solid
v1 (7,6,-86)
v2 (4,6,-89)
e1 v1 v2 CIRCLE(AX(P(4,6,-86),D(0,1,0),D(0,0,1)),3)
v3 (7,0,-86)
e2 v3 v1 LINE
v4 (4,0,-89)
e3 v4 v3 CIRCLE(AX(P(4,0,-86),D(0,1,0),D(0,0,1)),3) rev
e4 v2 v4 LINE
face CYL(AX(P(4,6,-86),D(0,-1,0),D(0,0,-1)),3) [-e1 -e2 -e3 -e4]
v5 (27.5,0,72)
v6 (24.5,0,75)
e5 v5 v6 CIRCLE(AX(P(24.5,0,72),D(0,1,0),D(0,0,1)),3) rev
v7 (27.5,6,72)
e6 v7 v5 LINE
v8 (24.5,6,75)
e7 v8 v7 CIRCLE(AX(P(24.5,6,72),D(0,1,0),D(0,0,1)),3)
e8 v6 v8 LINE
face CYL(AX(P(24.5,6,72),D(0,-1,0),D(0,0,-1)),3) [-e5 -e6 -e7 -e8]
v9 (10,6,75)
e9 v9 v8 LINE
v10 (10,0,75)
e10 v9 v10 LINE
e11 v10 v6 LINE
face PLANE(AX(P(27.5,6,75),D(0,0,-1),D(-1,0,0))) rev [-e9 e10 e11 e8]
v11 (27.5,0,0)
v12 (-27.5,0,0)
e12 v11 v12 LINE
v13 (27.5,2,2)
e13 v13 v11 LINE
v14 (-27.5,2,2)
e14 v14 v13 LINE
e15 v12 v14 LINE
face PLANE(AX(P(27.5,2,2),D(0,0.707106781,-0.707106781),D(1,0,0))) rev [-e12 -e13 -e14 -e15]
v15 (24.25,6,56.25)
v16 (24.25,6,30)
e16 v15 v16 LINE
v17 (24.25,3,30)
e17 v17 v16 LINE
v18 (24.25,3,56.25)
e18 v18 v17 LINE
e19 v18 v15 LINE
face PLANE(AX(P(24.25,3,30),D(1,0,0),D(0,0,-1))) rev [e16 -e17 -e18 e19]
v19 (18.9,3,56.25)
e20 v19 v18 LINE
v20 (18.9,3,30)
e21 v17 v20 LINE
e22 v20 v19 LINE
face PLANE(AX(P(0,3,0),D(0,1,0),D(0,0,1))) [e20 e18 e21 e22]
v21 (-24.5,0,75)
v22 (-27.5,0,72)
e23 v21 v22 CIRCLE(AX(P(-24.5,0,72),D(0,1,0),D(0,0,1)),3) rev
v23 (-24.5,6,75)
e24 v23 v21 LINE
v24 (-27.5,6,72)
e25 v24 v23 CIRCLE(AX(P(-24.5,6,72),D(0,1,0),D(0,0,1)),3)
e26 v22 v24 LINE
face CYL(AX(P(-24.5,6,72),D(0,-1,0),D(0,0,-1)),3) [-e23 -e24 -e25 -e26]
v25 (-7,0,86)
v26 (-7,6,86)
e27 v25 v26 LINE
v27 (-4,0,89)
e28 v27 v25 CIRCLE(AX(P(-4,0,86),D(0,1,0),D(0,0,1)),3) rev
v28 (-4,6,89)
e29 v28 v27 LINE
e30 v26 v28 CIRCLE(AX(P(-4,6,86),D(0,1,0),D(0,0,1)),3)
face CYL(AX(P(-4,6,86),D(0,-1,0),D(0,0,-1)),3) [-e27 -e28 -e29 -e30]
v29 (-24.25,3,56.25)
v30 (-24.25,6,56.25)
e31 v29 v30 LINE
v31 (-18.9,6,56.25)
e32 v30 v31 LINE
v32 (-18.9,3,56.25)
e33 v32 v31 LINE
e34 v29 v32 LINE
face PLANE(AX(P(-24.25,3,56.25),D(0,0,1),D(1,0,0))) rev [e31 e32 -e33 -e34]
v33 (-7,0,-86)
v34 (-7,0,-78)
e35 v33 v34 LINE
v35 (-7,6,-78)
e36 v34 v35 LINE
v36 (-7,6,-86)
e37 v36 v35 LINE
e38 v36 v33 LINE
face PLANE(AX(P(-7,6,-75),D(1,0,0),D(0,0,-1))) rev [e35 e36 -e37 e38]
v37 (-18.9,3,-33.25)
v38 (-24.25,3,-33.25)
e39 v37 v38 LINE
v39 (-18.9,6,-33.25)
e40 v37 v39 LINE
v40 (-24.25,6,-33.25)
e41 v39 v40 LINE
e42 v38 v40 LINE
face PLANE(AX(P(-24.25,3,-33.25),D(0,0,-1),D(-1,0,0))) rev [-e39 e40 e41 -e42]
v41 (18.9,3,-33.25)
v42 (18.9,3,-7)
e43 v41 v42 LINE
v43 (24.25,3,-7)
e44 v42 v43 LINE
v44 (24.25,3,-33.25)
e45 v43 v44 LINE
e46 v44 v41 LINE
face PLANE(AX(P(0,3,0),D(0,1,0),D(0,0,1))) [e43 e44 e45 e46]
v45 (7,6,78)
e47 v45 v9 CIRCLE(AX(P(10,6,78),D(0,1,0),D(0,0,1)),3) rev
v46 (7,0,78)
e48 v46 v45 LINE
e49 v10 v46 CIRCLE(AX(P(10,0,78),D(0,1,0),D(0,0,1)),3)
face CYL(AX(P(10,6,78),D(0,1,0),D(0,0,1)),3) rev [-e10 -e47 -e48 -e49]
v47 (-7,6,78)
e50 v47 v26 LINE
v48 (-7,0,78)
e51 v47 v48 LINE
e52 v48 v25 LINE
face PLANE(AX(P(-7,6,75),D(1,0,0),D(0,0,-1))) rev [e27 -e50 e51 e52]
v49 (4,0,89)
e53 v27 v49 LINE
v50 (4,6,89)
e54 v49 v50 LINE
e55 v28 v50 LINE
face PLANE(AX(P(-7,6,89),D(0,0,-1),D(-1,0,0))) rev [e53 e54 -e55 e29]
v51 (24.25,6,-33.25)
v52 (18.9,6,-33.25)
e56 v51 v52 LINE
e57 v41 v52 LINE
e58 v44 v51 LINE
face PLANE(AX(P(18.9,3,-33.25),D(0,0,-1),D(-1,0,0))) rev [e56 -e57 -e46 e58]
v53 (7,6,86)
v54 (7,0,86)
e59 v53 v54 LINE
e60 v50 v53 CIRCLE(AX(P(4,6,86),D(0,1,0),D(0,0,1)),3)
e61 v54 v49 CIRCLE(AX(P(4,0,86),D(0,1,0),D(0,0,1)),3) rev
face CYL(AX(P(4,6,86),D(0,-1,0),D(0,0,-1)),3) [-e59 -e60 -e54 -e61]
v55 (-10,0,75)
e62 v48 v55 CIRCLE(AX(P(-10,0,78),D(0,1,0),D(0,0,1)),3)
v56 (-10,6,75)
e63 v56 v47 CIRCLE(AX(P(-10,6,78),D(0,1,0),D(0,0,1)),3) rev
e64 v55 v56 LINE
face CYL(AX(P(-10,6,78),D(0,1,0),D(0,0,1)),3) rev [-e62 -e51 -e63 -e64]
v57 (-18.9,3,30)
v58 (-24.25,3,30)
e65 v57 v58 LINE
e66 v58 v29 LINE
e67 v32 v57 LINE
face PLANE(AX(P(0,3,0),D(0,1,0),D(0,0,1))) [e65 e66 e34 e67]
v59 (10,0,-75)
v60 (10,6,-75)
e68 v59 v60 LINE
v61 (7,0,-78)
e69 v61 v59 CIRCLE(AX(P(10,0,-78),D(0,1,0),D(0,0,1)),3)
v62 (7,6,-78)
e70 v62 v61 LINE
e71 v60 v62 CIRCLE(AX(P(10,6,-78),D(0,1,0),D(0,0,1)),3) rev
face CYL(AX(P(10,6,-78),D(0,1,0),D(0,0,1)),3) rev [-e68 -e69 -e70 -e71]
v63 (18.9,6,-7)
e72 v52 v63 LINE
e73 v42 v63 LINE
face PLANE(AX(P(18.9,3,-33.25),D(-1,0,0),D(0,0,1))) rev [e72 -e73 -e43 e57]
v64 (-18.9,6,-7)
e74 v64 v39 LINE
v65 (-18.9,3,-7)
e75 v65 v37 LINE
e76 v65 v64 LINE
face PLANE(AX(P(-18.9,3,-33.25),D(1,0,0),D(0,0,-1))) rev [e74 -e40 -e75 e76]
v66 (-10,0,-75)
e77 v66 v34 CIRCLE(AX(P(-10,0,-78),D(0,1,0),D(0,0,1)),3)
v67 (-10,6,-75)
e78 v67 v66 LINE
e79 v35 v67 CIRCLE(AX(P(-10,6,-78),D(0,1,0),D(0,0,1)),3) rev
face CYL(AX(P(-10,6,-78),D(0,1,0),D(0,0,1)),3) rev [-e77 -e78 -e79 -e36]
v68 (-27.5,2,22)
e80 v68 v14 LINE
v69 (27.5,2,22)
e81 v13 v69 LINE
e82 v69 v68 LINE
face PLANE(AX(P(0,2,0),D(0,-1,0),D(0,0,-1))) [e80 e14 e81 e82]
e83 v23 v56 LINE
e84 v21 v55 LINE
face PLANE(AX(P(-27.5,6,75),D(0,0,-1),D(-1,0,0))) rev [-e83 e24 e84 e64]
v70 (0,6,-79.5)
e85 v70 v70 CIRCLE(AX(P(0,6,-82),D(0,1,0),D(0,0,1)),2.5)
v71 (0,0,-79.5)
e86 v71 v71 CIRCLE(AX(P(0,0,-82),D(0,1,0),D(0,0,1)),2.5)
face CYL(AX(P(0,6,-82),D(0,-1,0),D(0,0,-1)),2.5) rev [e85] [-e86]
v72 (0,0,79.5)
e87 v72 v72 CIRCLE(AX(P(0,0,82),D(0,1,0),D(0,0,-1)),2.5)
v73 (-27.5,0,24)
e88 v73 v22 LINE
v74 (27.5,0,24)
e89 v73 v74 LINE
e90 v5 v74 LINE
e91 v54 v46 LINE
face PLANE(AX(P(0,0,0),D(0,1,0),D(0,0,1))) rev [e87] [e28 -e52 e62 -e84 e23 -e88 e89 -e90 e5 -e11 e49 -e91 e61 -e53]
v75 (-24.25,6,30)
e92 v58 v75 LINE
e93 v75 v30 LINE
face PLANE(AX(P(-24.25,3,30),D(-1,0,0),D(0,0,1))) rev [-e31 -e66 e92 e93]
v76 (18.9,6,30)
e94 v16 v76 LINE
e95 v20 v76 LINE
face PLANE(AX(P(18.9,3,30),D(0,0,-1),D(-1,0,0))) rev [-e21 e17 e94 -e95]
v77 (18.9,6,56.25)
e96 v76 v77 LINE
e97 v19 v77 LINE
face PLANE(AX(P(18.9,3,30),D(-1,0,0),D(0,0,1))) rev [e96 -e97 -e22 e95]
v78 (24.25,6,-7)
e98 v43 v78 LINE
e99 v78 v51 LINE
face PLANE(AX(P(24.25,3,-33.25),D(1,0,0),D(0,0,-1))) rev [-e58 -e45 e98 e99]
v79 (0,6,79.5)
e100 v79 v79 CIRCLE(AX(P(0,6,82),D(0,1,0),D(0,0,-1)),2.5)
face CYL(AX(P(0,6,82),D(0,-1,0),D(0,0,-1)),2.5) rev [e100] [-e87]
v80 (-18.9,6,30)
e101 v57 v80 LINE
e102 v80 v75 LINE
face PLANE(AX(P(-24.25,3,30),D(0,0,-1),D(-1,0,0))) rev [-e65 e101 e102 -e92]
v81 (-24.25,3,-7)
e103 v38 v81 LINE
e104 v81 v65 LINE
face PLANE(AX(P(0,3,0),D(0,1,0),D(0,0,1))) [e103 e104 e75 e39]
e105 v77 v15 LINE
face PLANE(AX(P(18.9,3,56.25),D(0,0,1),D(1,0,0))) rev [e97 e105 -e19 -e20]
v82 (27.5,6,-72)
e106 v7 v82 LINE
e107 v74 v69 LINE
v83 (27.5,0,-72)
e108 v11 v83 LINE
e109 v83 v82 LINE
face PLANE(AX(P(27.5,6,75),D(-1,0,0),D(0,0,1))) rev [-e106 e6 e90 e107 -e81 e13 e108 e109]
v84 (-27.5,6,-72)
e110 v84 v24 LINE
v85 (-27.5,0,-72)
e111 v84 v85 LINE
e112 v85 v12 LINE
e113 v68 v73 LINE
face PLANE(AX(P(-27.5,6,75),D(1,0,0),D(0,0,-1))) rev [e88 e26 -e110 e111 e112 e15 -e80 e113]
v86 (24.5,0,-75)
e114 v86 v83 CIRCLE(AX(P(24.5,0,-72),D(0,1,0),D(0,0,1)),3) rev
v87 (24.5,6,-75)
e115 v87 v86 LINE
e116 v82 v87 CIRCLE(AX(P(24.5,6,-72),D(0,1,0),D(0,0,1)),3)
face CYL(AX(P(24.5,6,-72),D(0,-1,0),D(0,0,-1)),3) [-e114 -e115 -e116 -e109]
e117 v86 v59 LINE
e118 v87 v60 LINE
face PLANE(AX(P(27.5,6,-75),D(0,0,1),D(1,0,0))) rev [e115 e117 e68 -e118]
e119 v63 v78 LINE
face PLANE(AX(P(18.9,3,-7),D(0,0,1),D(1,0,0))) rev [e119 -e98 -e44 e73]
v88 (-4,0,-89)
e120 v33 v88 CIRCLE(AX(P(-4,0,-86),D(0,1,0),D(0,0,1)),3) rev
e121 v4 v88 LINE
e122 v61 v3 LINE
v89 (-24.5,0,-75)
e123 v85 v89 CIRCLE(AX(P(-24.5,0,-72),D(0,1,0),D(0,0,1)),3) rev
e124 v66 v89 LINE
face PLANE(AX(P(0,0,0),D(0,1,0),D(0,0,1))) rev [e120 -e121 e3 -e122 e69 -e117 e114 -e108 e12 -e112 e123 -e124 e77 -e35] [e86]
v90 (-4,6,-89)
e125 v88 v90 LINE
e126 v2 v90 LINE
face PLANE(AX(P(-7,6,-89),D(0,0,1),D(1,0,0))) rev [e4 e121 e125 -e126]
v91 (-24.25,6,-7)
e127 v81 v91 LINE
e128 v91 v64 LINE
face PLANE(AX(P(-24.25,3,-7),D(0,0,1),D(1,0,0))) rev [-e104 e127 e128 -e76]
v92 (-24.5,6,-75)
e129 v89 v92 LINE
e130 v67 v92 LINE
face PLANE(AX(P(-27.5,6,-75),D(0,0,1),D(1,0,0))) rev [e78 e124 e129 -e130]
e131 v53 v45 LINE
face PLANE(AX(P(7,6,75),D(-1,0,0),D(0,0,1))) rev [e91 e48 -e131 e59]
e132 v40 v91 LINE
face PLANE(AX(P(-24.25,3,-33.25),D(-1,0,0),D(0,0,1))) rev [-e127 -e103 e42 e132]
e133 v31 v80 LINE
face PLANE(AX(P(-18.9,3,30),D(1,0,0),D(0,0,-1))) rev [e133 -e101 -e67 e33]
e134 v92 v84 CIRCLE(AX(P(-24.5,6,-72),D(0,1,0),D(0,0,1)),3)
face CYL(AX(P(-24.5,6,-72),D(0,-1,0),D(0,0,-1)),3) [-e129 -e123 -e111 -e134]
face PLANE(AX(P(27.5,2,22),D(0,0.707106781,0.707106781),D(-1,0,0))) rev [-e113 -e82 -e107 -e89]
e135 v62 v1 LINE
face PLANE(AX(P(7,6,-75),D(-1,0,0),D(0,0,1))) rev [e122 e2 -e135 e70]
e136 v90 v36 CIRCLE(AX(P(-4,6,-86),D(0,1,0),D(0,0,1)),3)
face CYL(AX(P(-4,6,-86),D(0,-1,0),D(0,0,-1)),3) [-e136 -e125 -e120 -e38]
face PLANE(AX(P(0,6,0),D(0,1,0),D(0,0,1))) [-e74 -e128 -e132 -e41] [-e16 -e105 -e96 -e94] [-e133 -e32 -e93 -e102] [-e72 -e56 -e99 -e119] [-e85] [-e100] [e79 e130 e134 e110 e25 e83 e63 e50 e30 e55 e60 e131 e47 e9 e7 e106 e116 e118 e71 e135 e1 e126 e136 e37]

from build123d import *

# Parameters (mm, degrees)
SKIZZE1_R                       = 2.5
AUFSATZ_LINEAR_AUSTRAGEN1_DEPTH = 6
SKIZZE2_W                       = 5.35
SKIZZE2_H                       = 26.25
SCHNITT_LINEAR_AUSTRAGEN1_DEPTH = 3
SKIZZE3_W                       = 55
SKIZZE3_H                       = 20
SCHNITT_LINEAR_AUSTRAGEN2_DEPTH = 2
VERRUNDUNG1_R                   = 3
FASE1_SIZE                      = 2


with BuildPart() as part:
    # Skizze1 → Aufsatz-Linear austragen1 (new body)
    with BuildSketch(Plane(origin=(0, 0, 0), x_dir=(1, 0, 0), z_dir=(0, 1, 0))):
        Polygon((-27.5, -75), (-27.5, 75), (-7, 75), (-7, 89), (7, 89), (7, 75), (27.5, 75), (27.5, -75), (7, -75), (7, -89), (-7, -89), (-7, -75), align=None)
        with Locations(Location((0, 82, 0), (0, 0, 270))):
            Circle(SKIZZE1_R, mode=Mode.SUBTRACT)
        with Locations(Location((0, -82, 0), (0, 0, 90))):
            Circle(SKIZZE1_R, mode=Mode.SUBTRACT)
    extrude(amount=AUFSATZ_LINEAR_AUSTRAGEN1_DEPTH)

    # Skizze2 → Schnitt-Linear austragen1 (cut)
    with BuildSketch(Plane(origin=(0, 6, 0), x_dir=(1, 0, 0), z_dir=(0, 1, 0))):
        with Locations((-21.575, 20.125)):
            Rectangle(SKIZZE2_W, SKIZZE2_H)
        with Locations((21.575, 20.125)):
            Rectangle(SKIZZE2_W, SKIZZE2_H)
        with Locations((-21.575, -43.125)):
            Rectangle(SKIZZE2_W, SKIZZE2_H)
        with Locations((21.575, -43.125)):
            Rectangle(SKIZZE2_W, SKIZZE2_H)
    extrude(amount=-SCHNITT_LINEAR_AUSTRAGEN1_DEPTH, mode=Mode.SUBTRACT)

    # Skizze3 → Schnitt-Linear austragen2 (cut)
    with BuildSketch(Plane.XZ):
        with Locations((0, 12)):
            Rectangle(SKIZZE3_W, SKIZZE3_H)
    extrude(amount=-SCHNITT_LINEAR_AUSTRAGEN2_DEPTH, mode=Mode.SUBTRACT)

    # Verrundung1
    verrundung1_edges = [part.edges().sort_by_distance(p)[0] for p in [
        (-7, 3, -75),
        (-7, 3, -89),
        (7, 3, -89),
        (7, 3, -75),
        (27.5, 3, -75),
        (27.5, 3, 75),
        (7, 3, 75),
        (7, 3, 89),
        (-7, 3, 89),
        (-7, 3, 75),
        (-27.5, 3, 75),
        (-27.5, 3, -75),
    ]]
    fillet(verrundung1_edges, radius=VERRUNDUNG1_R)

    # Fase1
    fase1_edges = [part.edges().sort_by_distance(p)[0] for p in [
        (0, 0, 22),
        (0, 0, 2),
    ]]
    chamfer(fase1_edges, length=FASE1_SIZE - 0.0001)  # a hair under: the kernel refuses the full size


solid = part.part
